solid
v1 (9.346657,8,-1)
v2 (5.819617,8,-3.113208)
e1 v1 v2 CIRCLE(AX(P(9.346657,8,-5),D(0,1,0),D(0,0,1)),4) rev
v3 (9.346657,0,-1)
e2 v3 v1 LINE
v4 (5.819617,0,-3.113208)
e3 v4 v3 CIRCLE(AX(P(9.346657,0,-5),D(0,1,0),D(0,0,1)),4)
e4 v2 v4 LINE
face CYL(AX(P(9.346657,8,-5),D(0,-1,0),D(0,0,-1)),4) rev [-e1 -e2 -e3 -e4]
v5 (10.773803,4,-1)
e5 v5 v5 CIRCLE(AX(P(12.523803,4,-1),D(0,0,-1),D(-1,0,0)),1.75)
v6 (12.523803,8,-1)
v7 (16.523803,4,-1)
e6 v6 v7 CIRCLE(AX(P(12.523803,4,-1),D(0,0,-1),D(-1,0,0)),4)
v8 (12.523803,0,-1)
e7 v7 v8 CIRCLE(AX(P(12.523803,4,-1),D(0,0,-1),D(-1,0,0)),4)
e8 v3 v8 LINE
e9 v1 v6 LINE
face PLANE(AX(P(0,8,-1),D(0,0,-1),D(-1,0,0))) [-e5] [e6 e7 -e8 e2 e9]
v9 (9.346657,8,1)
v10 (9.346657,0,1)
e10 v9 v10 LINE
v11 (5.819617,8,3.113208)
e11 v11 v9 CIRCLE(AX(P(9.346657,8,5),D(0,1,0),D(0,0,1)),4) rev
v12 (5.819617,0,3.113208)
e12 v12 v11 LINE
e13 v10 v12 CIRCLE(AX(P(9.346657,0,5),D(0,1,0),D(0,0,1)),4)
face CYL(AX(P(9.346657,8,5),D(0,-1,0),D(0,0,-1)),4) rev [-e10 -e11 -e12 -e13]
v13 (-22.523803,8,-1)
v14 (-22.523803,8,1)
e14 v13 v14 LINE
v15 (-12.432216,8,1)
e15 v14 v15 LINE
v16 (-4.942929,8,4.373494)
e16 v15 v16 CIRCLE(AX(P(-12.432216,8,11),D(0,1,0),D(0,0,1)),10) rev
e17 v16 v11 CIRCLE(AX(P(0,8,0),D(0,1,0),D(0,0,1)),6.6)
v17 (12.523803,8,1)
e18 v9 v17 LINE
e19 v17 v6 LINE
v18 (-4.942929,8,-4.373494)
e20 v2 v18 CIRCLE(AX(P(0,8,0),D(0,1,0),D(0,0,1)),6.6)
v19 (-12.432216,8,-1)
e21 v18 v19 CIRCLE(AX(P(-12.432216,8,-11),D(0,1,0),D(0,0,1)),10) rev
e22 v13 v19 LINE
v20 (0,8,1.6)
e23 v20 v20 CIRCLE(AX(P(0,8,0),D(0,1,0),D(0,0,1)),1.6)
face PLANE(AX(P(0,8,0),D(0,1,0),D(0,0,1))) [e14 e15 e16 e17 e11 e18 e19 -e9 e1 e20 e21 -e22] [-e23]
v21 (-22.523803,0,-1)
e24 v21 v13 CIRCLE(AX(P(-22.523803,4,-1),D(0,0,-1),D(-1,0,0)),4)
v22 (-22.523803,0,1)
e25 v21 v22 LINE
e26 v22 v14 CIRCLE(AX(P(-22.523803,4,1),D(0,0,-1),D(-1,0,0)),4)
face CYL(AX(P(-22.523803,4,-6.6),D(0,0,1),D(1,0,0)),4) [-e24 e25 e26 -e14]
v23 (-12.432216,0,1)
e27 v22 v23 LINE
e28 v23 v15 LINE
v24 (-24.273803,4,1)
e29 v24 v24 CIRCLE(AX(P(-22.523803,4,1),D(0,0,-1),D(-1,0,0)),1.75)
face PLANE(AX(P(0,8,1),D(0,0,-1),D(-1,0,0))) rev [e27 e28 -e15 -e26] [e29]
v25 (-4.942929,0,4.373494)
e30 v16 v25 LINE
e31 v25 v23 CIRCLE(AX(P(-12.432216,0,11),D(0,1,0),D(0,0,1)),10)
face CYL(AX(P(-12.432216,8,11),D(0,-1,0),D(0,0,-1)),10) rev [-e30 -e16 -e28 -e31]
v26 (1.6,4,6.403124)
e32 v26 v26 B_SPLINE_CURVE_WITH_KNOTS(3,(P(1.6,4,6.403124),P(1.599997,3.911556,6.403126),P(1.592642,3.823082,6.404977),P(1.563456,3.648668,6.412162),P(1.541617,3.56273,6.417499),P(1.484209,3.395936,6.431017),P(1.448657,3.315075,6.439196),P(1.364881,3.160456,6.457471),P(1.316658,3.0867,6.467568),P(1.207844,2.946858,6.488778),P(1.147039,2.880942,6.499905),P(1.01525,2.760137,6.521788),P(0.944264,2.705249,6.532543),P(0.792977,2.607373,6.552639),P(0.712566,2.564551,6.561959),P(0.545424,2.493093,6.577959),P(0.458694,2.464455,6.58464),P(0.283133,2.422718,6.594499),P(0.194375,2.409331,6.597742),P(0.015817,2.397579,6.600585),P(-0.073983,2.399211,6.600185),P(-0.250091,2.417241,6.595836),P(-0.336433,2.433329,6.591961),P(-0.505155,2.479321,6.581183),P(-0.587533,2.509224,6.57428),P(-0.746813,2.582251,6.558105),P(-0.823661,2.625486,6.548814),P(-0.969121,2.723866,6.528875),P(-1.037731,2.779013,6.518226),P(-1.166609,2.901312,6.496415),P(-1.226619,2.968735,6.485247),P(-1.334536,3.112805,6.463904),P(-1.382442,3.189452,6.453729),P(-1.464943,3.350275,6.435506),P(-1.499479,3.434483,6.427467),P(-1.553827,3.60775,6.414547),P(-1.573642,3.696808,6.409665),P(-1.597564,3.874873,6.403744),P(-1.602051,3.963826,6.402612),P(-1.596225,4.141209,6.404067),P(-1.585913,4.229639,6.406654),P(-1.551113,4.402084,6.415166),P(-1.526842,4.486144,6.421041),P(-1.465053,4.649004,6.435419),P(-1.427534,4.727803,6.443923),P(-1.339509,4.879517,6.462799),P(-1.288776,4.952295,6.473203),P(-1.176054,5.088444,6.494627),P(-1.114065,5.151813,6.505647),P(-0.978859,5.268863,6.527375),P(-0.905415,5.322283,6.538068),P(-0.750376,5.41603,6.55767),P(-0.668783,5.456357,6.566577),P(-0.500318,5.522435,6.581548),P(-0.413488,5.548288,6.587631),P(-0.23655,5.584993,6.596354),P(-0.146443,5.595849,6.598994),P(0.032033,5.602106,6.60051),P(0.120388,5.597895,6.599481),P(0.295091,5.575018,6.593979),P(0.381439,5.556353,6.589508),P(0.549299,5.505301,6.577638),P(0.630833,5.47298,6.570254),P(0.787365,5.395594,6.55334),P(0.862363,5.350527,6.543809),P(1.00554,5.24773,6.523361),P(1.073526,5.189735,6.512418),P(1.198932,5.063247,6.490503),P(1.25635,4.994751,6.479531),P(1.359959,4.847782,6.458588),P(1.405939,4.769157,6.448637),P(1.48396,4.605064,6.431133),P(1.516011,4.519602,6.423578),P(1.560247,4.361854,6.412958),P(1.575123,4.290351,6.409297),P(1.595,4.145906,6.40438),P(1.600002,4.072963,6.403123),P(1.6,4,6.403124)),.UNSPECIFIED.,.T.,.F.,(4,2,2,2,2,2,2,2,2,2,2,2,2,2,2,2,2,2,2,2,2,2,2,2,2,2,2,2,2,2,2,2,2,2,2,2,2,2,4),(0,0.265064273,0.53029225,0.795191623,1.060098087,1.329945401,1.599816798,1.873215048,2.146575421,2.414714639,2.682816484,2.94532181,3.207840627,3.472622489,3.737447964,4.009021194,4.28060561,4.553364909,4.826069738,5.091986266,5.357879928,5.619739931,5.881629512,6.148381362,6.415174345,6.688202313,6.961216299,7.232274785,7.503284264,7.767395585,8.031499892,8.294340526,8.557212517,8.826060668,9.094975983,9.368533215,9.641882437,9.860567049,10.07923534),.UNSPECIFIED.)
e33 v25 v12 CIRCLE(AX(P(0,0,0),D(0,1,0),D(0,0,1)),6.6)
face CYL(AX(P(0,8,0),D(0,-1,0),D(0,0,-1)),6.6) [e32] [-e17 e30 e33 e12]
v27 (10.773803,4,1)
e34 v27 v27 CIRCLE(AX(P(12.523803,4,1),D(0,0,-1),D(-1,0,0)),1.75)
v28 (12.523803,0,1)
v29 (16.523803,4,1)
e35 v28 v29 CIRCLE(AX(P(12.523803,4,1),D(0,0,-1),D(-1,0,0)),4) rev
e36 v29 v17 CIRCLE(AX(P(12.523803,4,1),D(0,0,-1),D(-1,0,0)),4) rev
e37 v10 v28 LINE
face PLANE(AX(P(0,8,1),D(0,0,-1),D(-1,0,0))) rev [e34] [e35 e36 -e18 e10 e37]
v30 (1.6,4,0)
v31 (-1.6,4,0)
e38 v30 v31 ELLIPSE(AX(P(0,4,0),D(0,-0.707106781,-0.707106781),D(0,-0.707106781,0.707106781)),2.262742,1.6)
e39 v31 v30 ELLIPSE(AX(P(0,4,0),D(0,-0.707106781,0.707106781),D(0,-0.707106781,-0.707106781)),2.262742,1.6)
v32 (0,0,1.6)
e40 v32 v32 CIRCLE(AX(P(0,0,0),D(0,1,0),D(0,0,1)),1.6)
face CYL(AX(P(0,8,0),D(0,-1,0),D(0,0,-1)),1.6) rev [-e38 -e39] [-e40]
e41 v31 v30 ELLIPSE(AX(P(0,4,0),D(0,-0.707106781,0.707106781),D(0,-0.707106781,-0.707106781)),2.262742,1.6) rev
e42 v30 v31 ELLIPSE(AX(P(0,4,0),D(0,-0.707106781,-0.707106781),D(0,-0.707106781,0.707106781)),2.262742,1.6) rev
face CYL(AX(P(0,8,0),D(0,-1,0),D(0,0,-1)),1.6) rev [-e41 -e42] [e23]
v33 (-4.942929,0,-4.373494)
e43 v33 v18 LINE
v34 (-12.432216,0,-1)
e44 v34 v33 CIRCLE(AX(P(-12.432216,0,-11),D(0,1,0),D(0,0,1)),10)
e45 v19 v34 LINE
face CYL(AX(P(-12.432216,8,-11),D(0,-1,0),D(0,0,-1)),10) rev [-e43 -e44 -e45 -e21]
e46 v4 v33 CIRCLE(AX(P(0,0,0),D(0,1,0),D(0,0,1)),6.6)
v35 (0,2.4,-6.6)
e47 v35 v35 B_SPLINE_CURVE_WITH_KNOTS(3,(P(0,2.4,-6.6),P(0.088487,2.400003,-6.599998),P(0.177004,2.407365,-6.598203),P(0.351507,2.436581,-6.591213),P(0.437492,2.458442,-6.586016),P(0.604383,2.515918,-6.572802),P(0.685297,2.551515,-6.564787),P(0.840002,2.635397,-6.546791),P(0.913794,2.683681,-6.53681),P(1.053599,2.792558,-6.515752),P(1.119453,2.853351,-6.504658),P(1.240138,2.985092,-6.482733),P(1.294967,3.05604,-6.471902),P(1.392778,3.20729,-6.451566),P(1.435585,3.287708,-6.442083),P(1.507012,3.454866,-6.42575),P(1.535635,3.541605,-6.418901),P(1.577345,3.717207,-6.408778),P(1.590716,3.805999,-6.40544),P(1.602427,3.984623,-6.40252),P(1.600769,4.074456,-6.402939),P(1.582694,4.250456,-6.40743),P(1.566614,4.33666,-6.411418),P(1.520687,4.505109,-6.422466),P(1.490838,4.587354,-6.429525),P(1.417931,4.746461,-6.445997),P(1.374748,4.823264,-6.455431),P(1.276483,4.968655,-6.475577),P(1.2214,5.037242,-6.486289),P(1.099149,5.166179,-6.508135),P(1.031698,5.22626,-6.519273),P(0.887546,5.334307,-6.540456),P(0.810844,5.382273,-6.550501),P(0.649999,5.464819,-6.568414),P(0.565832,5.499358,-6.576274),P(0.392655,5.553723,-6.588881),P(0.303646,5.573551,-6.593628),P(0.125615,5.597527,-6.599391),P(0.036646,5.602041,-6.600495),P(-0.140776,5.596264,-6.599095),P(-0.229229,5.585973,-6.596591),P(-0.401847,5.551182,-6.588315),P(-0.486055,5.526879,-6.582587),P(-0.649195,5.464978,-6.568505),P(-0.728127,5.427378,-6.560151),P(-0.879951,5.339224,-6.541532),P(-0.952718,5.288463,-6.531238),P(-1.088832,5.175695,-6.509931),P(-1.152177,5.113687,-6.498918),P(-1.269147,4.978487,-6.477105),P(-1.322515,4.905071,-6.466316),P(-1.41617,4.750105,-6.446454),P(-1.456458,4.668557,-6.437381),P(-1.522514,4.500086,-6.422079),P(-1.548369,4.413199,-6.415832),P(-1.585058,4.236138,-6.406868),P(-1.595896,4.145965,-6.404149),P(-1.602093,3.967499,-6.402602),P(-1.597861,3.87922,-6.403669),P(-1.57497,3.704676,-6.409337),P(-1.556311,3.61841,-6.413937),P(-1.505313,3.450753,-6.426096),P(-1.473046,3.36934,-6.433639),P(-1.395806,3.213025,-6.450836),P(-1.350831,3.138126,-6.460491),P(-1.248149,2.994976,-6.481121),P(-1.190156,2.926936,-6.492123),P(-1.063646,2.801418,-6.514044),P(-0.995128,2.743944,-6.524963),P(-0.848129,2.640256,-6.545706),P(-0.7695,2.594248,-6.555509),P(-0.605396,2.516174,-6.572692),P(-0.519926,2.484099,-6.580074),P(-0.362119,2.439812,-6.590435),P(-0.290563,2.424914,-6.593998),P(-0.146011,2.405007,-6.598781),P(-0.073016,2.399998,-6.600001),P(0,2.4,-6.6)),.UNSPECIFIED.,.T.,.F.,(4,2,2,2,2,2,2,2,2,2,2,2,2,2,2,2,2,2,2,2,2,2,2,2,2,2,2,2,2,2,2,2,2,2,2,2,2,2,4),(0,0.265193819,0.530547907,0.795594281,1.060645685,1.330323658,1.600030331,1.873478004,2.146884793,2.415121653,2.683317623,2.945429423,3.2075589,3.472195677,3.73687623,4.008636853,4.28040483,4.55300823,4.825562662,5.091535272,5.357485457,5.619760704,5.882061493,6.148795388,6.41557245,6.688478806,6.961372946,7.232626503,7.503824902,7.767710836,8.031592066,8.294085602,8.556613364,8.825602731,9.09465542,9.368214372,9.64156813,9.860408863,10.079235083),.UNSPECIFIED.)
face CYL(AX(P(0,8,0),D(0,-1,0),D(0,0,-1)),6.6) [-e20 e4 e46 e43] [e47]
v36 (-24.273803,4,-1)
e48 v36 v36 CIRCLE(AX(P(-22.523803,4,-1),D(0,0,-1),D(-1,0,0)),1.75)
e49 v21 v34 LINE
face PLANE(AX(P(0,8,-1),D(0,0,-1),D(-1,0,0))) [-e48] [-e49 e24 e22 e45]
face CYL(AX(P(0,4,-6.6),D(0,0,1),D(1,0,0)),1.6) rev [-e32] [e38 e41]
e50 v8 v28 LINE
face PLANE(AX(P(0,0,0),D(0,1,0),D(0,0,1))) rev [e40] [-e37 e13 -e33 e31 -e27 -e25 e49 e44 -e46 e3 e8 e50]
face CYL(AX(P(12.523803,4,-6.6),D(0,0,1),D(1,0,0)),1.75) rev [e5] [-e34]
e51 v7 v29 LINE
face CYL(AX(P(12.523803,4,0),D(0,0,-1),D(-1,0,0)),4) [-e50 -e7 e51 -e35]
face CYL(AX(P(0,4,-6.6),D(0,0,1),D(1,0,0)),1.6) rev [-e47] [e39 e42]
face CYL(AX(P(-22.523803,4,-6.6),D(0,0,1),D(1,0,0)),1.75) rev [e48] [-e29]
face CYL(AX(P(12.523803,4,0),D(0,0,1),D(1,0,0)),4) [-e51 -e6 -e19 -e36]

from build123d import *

# Parameters (mm, degrees)
SKETCH1_R               = 1.6
BOSS_EXTRUDE1_DEPTH     = 8
CUT_EXTRUDE1_DEPTH      = 29.727549545
CUT_EXTRUDE1_DEPTH_BACK = 29.727549545
SKETCH2_R               = 1.75
SKETCH2_R_2             = 1.6
FILLET1_R               = 10
FILLET2_R               = 4
FILLET3_R               = 4


with BuildPart() as part:
    # Sketch1 → Boss-Extrude1 (new body)
    with BuildSketch(Plane(origin=(0, 0, 0), x_dir=(1, 0, 0), z_dir=(0, 1, 0))):
        with BuildLine():
            Line((-26.523802572, 1), (-6.523802572, 1))
            ThreePointArc((-6.523802572, 1), (0, 6.6), (6.523802572, 1))
            Line((6.523802572, 1), (16.523802572, 1))
            Line((16.523802572, 1), (16.523802572, -1))
            Line((16.523802572, -1), (6.523802572, -1))
            ThreePointArc((6.523802572, -1), (0, -6.6), (-6.523802572, -1))
            Line((-6.523802572, -1), (-26.523802572, -1))
            Line((-26.523802572, -1), (-26.523802572, 1))
        make_face()
        with Locations(Location((0, 0, 0), (0, 0, 270))):
            Circle(SKETCH1_R, mode=Mode.SUBTRACT)
    extrude(amount=BOSS_EXTRUDE1_DEPTH)

    # Sketch2 → Cut-Extrude1 (cut, two sides: drawn at the far end of the back side and taken through both)
    with BuildSketch(Plane.XY.offset(1).offset(-CUT_EXTRUDE1_DEPTH_BACK)):
        with BuildLine():
            ThreePointArc((-26.523802572, 4.000000071), (-25.352229672, 6.82842715), (-22.523802572, 8))
            Line((-22.523802572, 8), (-26.523802572, 8))
            Line((-26.523802572, 8), (-26.523802572, 4.000000071))
        make_face()
        with BuildLine():
            Line((-26.523802572, 0), (-22.523802572, 0))
            ThreePointArc((-22.523802572, 0), (-25.352229722, 1.171572901), (-26.523802572, 4.000000071))
            Line((-26.523802572, 4.000000071), (-26.523802572, 0))
        make_face()
        with Locations(Location((-22.523802572, 4, 0), (0, 0, 180))):
            Circle(SKETCH2_R)
        with Locations((0, 4)):
            Circle(SKETCH2_R_2)
        with Locations(Location((12.523802572, 4, 0), (0, 0, 180))):
            Circle(SKETCH2_R)
    extrude(amount=CUT_EXTRUDE1_DEPTH + CUT_EXTRUDE1_DEPTH_BACK, mode=Mode.SUBTRACT)

    # Fillet1
    fillet1_edges = [part.edges().sort_by_distance(p)[0] for p in [
        (-6.523802572, 4, 1),
        (-6.523802572, 4, -1),
    ]]
    fillet(fillet1_edges, radius=FILLET1_R)

    # Fillet2
    fillet2_edges = [part.edges().sort_by_distance(p)[0] for p in [
        (16.523802572, 0, 0),
        (16.523802572, 8, 0),
    ]]
    fillet(fillet2_edges, radius=FILLET2_R - 0.0001)  # a hair under: the kernel refuses the full size

    # Fillet3
    fillet3_edges = [part.edges().sort_by_distance(p)[0] for p in [
        (6.523802572, 4, 1),
        (6.523802572, 4, -1),
    ]]
    fillet(fillet3_edges, radius=FILLET3_R)


solid = part.part
